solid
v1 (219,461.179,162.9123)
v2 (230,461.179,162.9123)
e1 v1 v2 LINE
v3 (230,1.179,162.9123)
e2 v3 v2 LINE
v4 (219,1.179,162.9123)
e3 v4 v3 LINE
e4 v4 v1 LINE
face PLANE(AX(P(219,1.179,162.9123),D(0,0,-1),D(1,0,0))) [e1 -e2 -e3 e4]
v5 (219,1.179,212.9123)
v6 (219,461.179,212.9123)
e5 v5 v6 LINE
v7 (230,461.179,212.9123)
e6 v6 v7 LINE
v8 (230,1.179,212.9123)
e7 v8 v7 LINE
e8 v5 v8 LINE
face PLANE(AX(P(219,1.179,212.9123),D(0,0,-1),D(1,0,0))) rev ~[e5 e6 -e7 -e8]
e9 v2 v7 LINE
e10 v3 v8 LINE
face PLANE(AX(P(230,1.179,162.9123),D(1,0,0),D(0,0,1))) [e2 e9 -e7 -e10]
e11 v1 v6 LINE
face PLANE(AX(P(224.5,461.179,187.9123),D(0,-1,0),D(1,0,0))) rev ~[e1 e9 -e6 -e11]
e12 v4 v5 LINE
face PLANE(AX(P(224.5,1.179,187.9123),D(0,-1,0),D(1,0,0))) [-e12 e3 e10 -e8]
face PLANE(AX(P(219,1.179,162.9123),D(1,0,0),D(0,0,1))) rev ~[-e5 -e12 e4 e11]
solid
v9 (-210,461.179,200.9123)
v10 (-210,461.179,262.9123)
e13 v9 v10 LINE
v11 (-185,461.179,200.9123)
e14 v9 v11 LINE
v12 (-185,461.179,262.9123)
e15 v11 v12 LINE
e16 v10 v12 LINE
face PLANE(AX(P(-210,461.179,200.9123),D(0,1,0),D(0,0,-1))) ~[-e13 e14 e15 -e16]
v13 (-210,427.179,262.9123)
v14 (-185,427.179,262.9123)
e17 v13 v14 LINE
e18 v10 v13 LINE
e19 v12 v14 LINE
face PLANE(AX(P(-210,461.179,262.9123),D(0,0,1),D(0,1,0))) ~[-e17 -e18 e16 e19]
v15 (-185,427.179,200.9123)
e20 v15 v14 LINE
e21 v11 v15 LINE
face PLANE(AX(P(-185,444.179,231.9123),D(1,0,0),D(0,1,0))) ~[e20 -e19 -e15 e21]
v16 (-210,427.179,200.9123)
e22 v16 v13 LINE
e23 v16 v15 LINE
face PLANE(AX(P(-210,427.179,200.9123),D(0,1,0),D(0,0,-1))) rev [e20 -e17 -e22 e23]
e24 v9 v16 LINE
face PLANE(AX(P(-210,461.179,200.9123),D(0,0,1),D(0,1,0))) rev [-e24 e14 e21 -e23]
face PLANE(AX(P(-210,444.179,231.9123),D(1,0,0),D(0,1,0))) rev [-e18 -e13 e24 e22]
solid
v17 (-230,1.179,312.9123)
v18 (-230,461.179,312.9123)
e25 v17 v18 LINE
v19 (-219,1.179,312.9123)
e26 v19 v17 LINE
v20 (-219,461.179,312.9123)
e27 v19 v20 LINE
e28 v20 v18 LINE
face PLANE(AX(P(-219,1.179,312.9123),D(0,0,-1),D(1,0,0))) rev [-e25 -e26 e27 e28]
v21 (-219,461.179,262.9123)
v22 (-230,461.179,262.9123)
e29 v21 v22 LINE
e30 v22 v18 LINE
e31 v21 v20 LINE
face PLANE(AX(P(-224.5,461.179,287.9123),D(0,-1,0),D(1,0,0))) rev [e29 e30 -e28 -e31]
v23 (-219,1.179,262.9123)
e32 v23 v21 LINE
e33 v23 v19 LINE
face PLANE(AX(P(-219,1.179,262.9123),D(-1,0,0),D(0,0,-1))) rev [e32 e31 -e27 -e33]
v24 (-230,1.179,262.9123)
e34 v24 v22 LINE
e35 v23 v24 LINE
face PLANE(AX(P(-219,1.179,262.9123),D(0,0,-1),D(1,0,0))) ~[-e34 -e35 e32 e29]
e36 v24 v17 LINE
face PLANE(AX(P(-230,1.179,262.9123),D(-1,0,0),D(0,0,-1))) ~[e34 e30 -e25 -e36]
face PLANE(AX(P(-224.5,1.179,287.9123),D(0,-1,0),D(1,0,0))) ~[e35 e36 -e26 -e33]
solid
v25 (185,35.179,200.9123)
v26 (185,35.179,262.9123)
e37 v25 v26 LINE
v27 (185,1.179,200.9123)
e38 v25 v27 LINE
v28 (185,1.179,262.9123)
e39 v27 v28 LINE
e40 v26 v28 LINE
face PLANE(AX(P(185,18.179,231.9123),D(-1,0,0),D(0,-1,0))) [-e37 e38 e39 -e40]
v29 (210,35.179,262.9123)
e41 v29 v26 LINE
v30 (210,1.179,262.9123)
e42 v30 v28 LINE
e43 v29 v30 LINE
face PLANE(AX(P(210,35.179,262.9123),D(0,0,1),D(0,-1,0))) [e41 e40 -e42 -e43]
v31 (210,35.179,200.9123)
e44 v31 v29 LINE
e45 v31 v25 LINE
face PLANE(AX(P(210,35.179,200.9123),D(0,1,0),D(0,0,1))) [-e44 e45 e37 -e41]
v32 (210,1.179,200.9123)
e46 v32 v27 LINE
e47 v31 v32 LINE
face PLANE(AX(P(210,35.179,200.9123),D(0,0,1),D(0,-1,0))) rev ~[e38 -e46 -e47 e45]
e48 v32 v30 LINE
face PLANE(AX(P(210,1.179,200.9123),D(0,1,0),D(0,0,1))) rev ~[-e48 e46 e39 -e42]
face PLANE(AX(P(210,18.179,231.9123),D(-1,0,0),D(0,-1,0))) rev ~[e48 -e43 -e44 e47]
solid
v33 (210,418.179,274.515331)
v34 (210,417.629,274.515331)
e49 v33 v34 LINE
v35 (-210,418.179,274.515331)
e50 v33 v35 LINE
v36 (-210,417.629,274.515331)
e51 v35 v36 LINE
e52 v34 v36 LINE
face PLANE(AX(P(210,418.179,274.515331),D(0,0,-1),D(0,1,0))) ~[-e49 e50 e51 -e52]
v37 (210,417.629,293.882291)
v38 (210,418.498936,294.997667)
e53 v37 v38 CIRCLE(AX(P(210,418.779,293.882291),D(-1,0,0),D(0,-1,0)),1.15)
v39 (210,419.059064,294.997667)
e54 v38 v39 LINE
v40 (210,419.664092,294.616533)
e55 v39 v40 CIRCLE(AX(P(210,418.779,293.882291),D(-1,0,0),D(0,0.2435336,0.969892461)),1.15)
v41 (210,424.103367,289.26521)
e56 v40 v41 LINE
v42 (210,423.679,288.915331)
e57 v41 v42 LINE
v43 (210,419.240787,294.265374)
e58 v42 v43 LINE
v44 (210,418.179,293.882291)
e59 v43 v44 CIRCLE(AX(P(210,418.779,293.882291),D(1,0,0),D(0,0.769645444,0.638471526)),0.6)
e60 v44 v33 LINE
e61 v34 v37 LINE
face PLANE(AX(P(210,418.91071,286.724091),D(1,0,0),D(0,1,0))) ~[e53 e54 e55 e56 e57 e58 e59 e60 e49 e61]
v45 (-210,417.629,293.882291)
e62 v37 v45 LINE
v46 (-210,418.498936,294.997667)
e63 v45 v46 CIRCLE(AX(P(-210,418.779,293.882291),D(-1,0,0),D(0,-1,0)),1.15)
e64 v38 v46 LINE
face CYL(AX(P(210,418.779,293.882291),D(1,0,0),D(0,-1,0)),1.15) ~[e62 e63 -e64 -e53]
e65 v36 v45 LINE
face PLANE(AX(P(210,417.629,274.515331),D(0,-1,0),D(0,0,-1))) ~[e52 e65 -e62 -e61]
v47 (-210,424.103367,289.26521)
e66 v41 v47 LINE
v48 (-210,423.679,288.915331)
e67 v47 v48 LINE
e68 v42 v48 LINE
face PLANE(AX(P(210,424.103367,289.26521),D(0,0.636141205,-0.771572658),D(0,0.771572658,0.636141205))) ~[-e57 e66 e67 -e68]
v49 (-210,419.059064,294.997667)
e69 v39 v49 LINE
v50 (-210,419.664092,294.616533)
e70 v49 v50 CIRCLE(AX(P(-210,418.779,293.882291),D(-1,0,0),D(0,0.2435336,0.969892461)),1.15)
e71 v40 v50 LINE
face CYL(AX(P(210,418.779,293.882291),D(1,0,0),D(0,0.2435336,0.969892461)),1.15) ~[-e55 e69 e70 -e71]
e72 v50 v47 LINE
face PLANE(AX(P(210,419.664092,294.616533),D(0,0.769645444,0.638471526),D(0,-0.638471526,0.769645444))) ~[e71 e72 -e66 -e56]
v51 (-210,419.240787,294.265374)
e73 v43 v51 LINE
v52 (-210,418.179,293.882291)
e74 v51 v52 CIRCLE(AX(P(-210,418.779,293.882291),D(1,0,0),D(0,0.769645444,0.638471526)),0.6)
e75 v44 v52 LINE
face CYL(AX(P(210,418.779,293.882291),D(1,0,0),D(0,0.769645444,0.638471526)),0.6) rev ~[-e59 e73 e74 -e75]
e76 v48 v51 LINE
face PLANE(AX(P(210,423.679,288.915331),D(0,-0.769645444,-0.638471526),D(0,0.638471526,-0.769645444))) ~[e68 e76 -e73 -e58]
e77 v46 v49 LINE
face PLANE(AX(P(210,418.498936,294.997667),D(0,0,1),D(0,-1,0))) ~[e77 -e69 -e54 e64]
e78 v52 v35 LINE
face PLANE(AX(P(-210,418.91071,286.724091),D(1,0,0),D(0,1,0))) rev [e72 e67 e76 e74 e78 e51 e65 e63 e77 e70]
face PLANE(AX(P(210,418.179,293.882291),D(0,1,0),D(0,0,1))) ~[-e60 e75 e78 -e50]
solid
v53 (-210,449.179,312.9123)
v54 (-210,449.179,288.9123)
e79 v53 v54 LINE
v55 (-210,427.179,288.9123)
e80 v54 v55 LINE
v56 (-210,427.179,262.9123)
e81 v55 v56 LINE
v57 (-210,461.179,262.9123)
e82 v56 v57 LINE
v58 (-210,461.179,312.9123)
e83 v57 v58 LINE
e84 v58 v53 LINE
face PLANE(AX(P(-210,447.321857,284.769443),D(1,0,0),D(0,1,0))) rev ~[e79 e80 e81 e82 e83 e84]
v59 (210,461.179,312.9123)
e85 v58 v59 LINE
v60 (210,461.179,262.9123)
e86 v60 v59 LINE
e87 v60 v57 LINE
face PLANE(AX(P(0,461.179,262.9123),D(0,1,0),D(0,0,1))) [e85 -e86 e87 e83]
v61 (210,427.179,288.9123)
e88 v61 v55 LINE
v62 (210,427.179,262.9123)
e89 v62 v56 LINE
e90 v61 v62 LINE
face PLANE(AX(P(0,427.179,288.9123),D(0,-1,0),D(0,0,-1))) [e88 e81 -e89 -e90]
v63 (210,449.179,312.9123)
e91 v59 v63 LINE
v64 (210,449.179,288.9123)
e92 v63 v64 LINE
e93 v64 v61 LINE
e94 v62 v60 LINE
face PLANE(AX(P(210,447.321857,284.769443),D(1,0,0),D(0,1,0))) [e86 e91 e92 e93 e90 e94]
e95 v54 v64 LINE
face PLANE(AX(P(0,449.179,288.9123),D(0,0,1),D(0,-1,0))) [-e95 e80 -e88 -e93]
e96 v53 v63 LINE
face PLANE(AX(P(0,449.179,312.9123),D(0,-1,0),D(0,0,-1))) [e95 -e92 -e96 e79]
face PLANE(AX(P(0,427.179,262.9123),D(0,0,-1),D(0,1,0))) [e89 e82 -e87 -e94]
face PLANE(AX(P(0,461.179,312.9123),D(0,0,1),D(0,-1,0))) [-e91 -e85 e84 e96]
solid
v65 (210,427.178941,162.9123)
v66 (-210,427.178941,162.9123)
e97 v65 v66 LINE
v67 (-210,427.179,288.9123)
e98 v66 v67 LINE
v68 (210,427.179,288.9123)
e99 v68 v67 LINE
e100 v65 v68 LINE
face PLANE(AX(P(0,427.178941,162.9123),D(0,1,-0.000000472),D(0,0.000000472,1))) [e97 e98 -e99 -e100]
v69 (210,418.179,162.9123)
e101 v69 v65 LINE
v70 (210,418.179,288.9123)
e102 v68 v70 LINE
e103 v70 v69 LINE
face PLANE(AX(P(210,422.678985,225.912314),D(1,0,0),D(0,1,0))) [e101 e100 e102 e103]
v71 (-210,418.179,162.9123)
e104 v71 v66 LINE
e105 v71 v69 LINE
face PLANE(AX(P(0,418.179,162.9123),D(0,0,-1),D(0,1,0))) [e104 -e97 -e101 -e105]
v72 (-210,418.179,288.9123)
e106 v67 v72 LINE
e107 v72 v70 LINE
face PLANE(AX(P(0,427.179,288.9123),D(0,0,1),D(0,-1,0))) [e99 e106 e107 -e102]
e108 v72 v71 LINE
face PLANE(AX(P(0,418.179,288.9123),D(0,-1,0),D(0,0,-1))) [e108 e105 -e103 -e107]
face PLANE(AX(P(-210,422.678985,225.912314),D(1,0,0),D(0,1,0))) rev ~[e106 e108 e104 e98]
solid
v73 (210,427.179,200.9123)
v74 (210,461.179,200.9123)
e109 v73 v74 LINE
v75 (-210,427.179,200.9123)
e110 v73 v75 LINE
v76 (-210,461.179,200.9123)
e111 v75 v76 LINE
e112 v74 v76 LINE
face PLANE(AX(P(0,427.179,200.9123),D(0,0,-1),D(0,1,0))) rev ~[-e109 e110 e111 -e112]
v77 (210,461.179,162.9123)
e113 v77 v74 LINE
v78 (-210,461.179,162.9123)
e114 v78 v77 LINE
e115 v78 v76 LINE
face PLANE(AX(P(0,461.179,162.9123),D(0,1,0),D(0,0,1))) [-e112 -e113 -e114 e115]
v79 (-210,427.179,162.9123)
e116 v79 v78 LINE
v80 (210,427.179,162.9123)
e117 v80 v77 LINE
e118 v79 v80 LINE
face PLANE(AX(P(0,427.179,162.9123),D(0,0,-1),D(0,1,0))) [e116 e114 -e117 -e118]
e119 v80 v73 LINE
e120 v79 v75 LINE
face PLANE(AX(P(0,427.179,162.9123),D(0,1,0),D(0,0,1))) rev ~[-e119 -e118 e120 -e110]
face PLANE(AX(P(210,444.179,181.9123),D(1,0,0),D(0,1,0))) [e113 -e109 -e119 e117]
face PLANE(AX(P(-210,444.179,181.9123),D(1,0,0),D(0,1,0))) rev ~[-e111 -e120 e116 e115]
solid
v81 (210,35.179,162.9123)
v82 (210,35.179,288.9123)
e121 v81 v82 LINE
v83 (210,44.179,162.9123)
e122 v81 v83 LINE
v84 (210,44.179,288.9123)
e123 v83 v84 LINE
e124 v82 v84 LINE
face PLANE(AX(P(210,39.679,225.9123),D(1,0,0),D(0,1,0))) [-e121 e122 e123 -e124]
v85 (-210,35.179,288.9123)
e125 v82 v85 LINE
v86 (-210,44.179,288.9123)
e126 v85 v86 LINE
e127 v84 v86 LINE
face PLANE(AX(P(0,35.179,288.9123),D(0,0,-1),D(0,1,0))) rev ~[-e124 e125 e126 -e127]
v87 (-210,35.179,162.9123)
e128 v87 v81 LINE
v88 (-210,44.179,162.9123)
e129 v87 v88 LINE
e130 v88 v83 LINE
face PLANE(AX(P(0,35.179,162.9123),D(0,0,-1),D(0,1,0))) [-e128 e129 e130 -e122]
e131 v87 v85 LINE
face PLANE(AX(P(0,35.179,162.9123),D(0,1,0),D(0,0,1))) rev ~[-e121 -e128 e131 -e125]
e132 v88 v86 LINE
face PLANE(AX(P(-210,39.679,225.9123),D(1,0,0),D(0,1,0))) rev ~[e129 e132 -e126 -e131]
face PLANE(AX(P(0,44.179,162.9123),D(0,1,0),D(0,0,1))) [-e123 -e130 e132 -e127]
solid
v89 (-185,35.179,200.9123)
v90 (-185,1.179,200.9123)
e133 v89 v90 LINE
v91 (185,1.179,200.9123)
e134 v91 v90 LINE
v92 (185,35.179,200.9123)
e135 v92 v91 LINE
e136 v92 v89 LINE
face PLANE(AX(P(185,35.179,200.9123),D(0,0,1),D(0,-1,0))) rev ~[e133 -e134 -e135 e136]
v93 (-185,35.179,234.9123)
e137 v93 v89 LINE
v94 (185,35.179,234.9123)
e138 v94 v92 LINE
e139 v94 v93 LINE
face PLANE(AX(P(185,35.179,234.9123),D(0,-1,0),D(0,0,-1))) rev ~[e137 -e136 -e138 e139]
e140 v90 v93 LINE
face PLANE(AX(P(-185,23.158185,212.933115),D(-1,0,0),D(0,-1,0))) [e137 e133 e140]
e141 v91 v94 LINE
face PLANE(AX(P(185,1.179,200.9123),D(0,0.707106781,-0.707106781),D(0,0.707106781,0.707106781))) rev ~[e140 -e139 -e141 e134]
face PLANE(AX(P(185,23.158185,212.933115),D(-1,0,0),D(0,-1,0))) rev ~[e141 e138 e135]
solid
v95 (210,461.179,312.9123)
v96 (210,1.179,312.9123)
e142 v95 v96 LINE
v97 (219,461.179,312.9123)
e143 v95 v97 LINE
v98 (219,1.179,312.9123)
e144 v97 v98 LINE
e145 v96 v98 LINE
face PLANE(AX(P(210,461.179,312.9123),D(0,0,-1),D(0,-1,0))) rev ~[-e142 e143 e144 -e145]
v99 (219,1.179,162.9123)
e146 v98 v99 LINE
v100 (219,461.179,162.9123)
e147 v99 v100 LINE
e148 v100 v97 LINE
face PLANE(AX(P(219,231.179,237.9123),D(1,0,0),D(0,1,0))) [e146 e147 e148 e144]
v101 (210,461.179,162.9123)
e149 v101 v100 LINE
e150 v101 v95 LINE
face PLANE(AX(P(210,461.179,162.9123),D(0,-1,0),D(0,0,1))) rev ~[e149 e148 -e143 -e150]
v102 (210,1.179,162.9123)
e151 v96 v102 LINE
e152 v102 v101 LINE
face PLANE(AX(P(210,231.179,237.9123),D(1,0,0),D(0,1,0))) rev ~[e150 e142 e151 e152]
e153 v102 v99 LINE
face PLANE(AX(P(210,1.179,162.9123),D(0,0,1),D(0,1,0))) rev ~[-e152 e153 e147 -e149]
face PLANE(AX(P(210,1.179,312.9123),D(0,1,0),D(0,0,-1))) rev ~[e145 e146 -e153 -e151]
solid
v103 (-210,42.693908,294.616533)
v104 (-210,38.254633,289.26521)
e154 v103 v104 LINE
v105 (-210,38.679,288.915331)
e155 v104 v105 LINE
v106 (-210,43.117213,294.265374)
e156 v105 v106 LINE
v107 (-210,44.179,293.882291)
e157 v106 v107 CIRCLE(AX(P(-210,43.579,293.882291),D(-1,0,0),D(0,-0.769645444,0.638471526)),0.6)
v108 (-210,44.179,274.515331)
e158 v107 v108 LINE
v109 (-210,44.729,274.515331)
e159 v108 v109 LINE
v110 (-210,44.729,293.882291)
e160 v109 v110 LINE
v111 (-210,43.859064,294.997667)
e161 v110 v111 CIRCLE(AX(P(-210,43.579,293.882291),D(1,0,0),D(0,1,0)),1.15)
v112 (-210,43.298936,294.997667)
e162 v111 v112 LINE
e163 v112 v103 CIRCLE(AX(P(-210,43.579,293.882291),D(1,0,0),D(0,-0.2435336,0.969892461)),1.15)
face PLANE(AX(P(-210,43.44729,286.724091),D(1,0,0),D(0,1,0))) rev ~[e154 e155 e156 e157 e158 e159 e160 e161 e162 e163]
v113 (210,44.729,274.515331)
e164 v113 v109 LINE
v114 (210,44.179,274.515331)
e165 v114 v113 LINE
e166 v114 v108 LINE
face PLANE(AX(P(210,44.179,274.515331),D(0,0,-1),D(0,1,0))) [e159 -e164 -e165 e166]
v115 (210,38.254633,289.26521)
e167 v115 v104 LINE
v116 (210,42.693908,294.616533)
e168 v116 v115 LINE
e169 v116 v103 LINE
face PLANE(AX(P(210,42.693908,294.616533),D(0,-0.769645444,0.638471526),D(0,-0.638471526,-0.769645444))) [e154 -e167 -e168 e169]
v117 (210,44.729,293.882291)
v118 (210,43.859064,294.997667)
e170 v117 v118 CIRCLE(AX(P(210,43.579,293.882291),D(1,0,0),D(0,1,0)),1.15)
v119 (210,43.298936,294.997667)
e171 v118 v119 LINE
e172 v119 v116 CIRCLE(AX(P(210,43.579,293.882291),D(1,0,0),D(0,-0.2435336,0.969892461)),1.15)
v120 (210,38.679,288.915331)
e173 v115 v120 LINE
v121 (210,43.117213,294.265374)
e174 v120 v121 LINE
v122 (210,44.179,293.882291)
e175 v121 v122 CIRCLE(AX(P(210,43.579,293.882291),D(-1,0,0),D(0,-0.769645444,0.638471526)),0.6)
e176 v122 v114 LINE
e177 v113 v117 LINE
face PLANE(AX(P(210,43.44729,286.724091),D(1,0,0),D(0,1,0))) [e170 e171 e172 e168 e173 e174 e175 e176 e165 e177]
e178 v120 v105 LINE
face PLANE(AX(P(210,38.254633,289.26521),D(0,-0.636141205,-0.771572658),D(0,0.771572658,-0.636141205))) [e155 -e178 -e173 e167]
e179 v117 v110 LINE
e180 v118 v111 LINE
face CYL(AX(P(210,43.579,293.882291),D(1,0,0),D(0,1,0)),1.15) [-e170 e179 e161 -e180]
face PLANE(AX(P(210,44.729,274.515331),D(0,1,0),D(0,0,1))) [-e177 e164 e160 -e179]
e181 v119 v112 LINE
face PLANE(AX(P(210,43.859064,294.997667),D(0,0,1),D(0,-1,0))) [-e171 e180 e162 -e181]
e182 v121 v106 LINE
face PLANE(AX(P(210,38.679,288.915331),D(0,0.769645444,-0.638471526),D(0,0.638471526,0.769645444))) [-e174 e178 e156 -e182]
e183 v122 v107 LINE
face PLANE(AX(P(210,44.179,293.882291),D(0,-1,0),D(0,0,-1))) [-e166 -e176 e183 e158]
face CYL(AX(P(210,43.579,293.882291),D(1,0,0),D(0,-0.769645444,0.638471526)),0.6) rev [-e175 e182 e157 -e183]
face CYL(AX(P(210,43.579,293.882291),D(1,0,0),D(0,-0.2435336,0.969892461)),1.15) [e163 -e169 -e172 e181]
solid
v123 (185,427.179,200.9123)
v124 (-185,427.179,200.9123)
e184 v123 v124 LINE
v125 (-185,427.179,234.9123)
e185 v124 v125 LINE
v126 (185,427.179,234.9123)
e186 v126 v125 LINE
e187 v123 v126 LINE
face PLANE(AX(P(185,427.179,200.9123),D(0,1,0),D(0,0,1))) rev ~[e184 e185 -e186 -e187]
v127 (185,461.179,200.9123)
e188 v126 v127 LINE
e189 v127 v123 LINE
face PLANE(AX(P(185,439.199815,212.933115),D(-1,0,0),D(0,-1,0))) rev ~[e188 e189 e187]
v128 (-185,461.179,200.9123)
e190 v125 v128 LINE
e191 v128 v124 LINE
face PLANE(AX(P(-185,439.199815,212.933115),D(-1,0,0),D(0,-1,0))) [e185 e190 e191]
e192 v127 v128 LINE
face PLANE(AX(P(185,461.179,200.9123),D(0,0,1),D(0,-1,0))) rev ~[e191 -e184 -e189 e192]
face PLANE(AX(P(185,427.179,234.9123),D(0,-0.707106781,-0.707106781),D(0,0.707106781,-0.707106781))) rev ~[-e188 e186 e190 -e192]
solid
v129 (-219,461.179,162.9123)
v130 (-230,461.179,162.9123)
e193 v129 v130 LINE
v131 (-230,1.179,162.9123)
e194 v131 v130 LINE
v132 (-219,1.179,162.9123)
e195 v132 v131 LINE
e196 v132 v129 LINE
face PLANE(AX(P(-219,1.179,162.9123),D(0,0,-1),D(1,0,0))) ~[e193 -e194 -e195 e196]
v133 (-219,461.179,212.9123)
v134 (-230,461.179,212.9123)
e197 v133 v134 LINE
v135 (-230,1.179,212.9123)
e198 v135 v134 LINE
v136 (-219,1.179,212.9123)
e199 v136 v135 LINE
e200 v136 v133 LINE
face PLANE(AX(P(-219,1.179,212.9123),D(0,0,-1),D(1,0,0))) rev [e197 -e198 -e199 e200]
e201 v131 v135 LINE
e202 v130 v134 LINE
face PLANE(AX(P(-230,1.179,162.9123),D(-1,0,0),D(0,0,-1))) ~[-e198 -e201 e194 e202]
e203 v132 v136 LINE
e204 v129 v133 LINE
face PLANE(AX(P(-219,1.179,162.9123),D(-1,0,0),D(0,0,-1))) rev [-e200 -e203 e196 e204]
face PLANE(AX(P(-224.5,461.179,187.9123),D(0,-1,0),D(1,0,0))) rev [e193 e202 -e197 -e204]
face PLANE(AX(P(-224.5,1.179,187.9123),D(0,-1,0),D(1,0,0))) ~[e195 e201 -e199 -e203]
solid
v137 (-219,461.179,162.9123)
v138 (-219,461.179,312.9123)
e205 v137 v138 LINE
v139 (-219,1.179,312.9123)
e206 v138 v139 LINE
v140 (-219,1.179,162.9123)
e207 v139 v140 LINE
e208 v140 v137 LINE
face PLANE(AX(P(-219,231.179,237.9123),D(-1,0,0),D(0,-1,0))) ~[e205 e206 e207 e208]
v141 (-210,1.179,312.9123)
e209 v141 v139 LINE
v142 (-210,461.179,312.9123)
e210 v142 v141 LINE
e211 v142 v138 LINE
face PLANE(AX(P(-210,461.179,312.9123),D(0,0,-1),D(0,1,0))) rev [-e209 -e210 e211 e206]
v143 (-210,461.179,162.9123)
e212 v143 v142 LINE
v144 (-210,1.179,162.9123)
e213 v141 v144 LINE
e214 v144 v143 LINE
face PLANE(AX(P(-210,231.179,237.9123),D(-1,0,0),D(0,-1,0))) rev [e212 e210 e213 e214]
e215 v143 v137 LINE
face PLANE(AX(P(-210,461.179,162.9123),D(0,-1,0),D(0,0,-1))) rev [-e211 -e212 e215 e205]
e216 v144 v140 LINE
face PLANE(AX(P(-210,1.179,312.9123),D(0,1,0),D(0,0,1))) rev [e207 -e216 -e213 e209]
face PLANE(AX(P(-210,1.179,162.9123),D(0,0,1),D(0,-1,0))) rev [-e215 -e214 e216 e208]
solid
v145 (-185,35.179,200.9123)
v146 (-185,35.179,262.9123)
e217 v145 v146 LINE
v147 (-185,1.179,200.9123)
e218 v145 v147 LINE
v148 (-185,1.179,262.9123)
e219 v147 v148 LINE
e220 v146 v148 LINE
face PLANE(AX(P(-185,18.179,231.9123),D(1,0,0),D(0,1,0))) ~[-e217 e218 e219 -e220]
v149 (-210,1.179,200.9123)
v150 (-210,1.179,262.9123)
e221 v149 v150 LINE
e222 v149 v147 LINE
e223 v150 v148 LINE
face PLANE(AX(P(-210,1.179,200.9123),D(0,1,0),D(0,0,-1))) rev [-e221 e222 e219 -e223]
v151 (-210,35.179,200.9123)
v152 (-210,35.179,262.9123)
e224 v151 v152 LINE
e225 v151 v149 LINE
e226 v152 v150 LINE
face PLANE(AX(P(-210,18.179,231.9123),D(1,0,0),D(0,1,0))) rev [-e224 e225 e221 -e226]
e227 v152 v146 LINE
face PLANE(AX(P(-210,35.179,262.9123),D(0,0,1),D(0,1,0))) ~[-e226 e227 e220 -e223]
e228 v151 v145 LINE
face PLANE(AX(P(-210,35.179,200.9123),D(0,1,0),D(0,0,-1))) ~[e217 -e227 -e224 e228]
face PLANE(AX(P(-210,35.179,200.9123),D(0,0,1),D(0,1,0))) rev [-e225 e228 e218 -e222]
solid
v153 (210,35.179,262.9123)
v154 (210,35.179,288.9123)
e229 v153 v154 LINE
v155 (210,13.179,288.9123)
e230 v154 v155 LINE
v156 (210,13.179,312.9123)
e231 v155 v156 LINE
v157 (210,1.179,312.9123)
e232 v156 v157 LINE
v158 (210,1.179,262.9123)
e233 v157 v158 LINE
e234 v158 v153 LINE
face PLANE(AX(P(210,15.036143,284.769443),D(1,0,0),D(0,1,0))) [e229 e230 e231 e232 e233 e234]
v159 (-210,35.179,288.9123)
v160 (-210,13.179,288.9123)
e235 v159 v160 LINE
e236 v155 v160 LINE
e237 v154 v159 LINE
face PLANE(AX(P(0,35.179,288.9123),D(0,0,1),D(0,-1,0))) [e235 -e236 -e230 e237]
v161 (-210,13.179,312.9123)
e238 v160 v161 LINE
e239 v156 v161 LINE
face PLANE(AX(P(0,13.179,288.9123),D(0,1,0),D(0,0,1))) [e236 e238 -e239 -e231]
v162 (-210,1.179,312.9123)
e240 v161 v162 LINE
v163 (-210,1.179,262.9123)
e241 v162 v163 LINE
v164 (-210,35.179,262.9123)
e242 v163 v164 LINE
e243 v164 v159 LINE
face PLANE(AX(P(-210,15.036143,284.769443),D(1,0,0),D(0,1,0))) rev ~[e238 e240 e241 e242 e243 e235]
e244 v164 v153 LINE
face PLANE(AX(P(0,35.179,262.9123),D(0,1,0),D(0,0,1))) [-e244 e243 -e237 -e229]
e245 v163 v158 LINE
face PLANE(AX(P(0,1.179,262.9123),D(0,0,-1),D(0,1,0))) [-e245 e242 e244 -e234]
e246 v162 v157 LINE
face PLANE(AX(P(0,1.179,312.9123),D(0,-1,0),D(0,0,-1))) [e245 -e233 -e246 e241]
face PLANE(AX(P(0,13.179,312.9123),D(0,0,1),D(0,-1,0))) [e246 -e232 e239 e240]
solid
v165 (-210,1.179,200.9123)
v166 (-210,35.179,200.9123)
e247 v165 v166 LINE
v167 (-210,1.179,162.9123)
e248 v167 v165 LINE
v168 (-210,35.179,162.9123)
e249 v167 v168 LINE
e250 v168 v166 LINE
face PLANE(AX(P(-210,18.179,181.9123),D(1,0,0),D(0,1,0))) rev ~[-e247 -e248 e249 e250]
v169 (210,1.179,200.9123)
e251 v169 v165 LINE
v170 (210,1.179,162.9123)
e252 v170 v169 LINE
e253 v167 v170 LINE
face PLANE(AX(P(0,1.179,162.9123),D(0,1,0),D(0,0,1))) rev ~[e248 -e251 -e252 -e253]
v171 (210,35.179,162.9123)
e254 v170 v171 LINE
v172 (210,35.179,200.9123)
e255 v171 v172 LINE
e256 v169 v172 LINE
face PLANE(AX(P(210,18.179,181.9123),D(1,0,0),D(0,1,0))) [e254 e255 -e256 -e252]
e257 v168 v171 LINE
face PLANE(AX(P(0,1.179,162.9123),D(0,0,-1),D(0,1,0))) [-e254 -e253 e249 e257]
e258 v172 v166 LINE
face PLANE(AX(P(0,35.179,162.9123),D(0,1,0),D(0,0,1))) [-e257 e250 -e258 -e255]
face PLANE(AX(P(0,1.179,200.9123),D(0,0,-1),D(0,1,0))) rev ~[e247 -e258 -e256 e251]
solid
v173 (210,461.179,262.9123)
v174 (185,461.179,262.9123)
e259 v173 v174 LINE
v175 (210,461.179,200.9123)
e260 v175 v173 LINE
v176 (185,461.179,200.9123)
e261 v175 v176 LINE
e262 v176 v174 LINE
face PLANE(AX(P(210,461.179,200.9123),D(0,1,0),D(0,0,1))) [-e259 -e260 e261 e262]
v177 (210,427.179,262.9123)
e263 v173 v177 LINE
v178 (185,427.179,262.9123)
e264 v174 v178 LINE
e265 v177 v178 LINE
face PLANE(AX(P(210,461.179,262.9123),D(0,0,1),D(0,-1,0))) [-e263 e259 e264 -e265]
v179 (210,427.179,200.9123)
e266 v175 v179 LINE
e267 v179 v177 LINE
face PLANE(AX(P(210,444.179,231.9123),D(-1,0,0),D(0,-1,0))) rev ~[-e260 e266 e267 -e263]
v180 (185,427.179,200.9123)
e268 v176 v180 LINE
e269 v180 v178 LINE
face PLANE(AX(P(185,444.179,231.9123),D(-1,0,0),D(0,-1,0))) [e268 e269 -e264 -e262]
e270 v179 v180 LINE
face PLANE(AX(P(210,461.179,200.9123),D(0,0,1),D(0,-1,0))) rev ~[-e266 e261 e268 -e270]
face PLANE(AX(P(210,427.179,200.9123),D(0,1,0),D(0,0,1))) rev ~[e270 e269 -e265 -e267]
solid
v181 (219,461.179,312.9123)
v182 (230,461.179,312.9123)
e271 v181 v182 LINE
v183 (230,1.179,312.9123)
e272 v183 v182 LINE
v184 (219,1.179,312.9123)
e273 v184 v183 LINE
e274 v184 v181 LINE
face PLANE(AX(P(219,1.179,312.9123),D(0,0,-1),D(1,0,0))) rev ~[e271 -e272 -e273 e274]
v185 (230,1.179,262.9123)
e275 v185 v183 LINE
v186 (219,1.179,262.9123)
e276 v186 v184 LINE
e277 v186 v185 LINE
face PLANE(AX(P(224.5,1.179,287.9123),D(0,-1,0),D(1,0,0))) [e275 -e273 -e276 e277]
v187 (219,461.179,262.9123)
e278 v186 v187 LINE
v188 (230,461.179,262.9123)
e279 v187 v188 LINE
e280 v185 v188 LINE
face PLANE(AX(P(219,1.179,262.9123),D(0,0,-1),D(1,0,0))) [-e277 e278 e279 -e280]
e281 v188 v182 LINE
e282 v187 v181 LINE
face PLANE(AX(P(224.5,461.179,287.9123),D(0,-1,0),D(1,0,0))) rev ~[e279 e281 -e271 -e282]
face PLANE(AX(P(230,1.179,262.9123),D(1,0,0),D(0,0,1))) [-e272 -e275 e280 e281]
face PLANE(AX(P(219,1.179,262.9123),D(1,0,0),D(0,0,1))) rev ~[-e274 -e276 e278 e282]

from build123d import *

# Parameters (mm, degrees)
F0_W      = 9
F0_H      = 126
F1_DEPTH  = 210
F2_W      = 34
F2_H      = 38
F3_DEPTH  = 210
F5_DEPTH  = 420
F9_DEPTH  = 9
F10_W     = 11
F10_H     = 50
F11_DEPTH = 460
F12_W     = 34
F12_H     = 62
F13_DEPTH = 25
F16_DEPTH = 370


# Not quite as in the source:
# - ends of sketch curves that miss each other by under 0.0002 mm in the source are joined


with BuildPart() as f1:
    # F0 (on Right) → F1 (new body, symmetric)
    with BuildSketch(Plane.YZ):
        with Locations((39.679, 225.9123)):
            Rectangle(F0_W, F0_H)
    extrude(amount=F1_DEPTH, both=True)


with BuildPart() as f1b:
    # F0 (on Right) → F1, piece 2 (new body, symmetric)
    with BuildSketch(Plane.YZ):
        Polygon((427.179, 288.9123), (418.179, 288.9123), (418.179, 162.9122999998), (427.1789405548, 162.9123), align=None)
    extrude(amount=F1_DEPTH, both=True)


with BuildPart() as f3:
    # F2 (on Right) → F3 (new body, symmetric)
    with BuildSketch(Plane.YZ):
        with Locations((18.179, 181.9123)):
            Rectangle(F2_W, F2_H)
    extrude(amount=F3_DEPTH, both=True)


with BuildPart() as f3b:
    # F2 (on Right) → F3, piece 2 (new body, symmetric)
    with BuildSketch(Plane.YZ):
        Polygon((13.179, 312.9123), (1.179, 312.9123), (1.179, 262.9123), (35.179, 262.9123), (35.179, 288.9123), (13.179, 288.9123), align=None)
    extrude(amount=F3_DEPTH, both=True)


with BuildPart() as f3c:
    # F2 (on Right) → F3, piece 3 (new body, symmetric)
    with BuildSketch(Plane.YZ):
        Polygon((461.179, 262.9123), (461.179, 312.9123), (449.179, 312.9123), (449.179, 288.9123), (427.179, 288.9123), (427.179, 262.9123), align=None)
    extrude(amount=F3_DEPTH, both=True)


with BuildPart() as f3d:
    # F2 (on Right) → F3, piece 4 (new body, symmetric)
    with BuildSketch(Plane.YZ):
        with Locations((444.179, 181.9123)):
            Rectangle(F2_W, F2_H)
    extrude(amount=F3_DEPTH, both=True)


with BuildPart() as f5:
    # F4 (on face) → F5 (new body, through all)
    with BuildSketch(Plane.YZ.offset(210)):
        with BuildLine():
            ThreePointArc((43.1172127334, 294.2653739331), (43.7826266683, 294.4466811128), (44.179, 293.8822910173))
            Line((44.179, 293.8822910173), (44.179, 274.5153307915))
            Line((44.179, 274.5153307915), (44.729, 274.5153307915))
            Line((44.729, 274.5153307915), (44.729, 293.8822910173))
            ThreePointArc((44.729, 293.8822910173), (44.4858001945, 294.5895486841), (43.8590636395, 294.9976673474))
            Line((43.8590636395, 294.9976673474), (43.2989363605, 294.9976673474))
            ThreePointArc((43.2989363605, 294.9976673474), (42.9660457898, 294.8553208915), (42.6939077391, 294.6165332727))
            Line((42.6939077391, 294.6165332727), (38.2546330976, 289.2652100541))
            Line((38.2546330976, 289.2652100541), (38.679, 288.9153307915))
            Line((38.679, 288.9153307915), (43.1172127334, 294.2653739331))
        make_face()
    extrude(amount=-F5_DEPTH)


with BuildPart() as f7_1:
    # F7: instance of F5
    add(f5.part.mirror(Plane(origin=(0, 231.179, 225.9122999999), x_dir=(-1, 0, 0), z_dir=(0, 1, 0))))


with BuildPart() as f9:
    # F8 (on face) → F9 (new body)
    with BuildSketch(Plane.YZ.offset(210)):
        Polygon((1.179, 312.9123), (1.179, 162.9123), (461.179, 162.9123), (461.179, 312.9123), (13.179, 312.9123), align=None)
    extrude(amount=F9_DEPTH)


with BuildPart() as f11:
    # F10 (on face) → F11 (new body, through all)
    with BuildSketch(Plane.XZ.offset(-1.179)):
        with Locations((224.5, 287.9123)):
            Rectangle(F10_W, F10_H)
    extrude(amount=-F11_DEPTH)


with BuildPart() as f11b:
    # F10 (on face) → F11, piece 2 (new body, through all)
    with BuildSketch(Plane.XZ.offset(-1.179)):
        with Locations((224.5, 187.9123)):
            Rectangle(F10_W, F10_H)
    extrude(amount=-F11_DEPTH)


with BuildPart() as f13:
    # F12 (on face) → F13 (new body)
    with BuildSketch(Plane(origin=(210, 0, 0), x_dir=(0, -1, 0), z_dir=(-1, 0, 0))):
        with Locations((-18.179, 231.9123)):
            Rectangle(F12_W, F12_H)
    extrude(amount=F13_DEPTH)


with BuildPart() as f13b:
    # F12 (on face) → F13, piece 2 (new body)
    with BuildSketch(Plane(origin=(210, 0, 0), x_dir=(0, -1, 0), z_dir=(-1, 0, 0))):
        with Locations((-444.179, 231.9123)):
            Rectangle(F12_W, F12_H)
    extrude(amount=F13_DEPTH)


with BuildPart() as f14_1:
    # F14: instance of F9
    add(f9.part.mirror(Plane.YZ))


with BuildPart() as f14_2:
    # F14: instance of F11b
    add(f11b.part.mirror(Plane.YZ))


with BuildPart() as f14_3:
    # F14: instance of F11
    add(f11.part.mirror(Plane.YZ))


with BuildPart() as f14_4:
    # F14: instance of F13
    add(f13.part.mirror(Plane.YZ))


with BuildPart() as f14_5:
    # F14: instance of F13b
    add(f13b.part.mirror(Plane.YZ))


with BuildPart() as f16:
    # F15 (on face) → F16 (new body, through all)
    with BuildSketch(Plane(origin=(185, 0, 0), x_dir=(0, -1, 0), z_dir=(-1, 0, 0))):
        Polygon((-35.179, 234.9123), (-35.179, 200.9123), (-1.179, 200.9123), align=None)
    extrude(amount=F16_DEPTH)


with BuildPart() as f16b:
    # F15 (on face) → F16, piece 2 (new body, through all)
    with BuildSketch(Plane(origin=(185, 0, 0), x_dir=(0, -1, 0), z_dir=(-1, 0, 0))):
        Polygon((-461.179, 200.9123), (-427.179, 200.9123), (-427.179, 234.9123), align=None)
    extrude(amount=F16_DEPTH)


solid = Compound([f1.part, f1b.part, f3.part, f3b.part, f3c.part, f3d.part, f5.part, f7_1.part, f9.part, f11.part, f11b.part, f13.part, f13b.part, f14_1.part, f14_2.part, f14_3.part, f14_4.part, f14_5.part, f16.part, f16b.part])
